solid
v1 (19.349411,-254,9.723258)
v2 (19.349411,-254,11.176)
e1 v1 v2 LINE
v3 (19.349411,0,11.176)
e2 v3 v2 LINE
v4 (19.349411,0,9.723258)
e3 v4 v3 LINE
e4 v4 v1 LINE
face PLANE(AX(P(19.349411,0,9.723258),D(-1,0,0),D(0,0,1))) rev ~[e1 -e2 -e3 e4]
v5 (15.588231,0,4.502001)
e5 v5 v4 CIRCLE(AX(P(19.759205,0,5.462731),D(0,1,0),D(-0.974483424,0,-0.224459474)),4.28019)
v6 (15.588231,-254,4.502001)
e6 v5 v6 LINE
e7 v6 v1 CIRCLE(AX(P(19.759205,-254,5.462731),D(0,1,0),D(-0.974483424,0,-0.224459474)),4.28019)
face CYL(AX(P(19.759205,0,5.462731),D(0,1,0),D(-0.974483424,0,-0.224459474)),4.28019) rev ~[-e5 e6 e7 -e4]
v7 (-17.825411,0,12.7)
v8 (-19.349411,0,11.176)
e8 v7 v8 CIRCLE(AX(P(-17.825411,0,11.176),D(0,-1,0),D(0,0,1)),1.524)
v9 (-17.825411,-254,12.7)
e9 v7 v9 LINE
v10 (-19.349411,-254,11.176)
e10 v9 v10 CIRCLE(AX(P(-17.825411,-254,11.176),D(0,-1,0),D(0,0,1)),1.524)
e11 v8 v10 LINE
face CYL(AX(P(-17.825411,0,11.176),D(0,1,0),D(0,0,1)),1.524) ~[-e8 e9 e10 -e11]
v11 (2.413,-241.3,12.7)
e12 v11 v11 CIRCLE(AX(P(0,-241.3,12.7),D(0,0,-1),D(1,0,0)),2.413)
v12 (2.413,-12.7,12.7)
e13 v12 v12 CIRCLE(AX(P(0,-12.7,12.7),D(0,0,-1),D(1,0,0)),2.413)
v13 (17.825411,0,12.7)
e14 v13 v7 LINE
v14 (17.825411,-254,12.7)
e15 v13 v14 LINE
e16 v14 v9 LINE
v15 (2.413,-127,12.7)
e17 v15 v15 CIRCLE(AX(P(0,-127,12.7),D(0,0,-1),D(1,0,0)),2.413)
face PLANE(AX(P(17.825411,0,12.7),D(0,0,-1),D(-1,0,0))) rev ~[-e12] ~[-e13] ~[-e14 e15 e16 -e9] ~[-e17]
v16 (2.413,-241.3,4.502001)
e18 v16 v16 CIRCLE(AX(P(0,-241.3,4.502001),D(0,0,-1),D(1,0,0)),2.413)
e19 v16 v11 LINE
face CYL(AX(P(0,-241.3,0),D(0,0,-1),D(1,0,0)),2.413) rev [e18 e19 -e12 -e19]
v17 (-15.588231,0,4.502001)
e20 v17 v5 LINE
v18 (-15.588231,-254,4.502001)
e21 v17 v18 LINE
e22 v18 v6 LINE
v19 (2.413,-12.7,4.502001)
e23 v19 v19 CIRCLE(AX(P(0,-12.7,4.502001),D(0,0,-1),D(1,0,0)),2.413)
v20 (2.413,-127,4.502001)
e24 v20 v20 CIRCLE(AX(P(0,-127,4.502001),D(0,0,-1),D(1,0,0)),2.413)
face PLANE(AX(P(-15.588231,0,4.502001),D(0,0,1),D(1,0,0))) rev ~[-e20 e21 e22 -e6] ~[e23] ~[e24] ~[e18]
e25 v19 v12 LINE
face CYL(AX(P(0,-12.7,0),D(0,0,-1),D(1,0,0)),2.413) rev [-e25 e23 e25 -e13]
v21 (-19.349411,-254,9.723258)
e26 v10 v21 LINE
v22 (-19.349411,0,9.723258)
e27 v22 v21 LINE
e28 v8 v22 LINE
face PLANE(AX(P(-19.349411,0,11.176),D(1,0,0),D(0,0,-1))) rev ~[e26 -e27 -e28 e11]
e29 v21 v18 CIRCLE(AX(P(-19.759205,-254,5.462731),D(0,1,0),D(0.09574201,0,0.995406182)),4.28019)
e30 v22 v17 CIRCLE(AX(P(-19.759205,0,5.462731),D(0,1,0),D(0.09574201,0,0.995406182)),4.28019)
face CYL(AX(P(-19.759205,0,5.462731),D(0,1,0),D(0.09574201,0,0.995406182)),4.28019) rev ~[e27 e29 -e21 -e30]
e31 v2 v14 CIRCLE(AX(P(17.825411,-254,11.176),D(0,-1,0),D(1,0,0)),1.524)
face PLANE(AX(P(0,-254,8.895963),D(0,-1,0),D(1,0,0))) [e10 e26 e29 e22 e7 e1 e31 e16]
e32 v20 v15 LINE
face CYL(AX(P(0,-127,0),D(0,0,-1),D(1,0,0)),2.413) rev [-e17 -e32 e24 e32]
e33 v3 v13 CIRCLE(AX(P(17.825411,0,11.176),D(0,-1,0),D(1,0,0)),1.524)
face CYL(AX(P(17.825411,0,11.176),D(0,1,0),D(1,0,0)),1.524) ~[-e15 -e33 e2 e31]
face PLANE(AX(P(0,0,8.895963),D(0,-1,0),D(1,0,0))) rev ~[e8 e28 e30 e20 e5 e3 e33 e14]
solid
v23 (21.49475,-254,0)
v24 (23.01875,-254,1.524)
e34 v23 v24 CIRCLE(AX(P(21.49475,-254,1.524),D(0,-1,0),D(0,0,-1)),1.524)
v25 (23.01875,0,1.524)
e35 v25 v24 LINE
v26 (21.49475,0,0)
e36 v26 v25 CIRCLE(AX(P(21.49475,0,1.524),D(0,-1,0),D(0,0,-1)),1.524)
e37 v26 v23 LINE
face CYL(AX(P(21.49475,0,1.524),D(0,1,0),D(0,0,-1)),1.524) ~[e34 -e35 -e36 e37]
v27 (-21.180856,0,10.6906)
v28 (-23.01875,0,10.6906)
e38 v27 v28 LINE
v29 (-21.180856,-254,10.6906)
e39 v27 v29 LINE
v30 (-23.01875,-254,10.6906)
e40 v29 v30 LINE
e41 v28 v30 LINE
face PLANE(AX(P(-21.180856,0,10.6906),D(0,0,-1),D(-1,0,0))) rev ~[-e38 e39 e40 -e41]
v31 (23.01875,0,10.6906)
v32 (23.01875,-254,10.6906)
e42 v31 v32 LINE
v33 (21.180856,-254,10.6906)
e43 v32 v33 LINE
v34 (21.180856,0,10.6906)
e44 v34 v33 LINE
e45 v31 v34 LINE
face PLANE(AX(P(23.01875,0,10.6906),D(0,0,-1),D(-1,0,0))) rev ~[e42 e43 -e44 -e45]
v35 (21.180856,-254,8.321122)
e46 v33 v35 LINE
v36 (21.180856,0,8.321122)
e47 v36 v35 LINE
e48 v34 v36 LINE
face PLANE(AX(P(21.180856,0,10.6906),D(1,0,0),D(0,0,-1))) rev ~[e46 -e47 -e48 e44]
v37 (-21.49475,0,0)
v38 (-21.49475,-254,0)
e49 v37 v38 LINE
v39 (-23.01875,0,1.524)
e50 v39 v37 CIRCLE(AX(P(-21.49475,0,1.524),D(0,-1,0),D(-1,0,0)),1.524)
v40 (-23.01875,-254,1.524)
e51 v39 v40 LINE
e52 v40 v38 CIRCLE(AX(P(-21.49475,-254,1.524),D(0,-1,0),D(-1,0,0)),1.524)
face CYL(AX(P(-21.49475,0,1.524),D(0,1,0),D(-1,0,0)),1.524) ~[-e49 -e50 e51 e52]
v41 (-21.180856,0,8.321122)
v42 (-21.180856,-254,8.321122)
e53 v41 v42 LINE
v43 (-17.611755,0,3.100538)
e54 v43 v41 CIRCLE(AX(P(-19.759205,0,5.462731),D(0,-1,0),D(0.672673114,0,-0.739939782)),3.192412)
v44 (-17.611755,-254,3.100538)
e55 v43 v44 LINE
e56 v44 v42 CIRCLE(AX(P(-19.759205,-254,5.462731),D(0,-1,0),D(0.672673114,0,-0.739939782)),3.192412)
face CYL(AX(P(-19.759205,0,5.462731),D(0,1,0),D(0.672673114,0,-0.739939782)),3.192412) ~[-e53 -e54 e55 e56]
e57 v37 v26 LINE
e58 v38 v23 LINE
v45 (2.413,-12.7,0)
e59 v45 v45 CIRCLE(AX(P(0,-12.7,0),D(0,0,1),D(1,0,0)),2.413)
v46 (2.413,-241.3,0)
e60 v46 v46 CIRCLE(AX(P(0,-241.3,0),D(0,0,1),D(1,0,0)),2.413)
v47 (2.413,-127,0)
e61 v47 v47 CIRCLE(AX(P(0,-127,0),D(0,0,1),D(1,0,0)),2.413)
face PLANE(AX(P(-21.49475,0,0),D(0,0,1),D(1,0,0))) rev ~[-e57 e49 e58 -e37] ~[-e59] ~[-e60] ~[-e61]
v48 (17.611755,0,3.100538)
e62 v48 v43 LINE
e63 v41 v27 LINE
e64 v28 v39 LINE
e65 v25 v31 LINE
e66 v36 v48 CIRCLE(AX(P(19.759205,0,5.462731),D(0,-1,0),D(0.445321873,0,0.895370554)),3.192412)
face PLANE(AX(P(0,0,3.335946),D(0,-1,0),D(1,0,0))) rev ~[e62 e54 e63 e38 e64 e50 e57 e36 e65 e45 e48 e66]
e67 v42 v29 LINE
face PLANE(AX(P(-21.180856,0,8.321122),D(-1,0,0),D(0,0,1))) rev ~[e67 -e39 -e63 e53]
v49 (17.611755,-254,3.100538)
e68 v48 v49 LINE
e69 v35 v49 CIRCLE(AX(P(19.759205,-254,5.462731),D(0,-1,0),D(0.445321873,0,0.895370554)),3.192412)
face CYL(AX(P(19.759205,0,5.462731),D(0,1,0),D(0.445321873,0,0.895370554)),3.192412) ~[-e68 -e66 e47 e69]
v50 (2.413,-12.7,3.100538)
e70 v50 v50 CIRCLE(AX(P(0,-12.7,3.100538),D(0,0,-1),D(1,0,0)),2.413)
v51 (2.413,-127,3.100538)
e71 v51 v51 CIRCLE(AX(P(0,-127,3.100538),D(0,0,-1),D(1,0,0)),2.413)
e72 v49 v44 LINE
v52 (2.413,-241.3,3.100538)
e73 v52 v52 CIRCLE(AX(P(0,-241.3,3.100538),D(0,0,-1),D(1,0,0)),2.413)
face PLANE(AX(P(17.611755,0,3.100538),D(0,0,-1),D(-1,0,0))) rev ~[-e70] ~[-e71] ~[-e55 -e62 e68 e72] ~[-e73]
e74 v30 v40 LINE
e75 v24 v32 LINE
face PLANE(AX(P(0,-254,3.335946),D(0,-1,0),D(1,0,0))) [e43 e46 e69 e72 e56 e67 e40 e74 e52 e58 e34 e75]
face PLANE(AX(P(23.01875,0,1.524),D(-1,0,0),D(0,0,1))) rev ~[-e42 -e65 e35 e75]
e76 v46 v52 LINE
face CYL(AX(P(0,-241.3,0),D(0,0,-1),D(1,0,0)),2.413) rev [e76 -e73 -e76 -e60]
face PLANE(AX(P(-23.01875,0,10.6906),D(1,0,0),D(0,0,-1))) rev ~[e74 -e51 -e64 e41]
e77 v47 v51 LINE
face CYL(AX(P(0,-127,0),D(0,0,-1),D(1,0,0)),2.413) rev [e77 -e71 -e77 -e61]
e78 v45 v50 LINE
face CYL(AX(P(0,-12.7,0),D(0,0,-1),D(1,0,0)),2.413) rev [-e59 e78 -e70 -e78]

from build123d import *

# Parameters (mm, degrees)
F1_DEPTH      = 254
F2_R          = 2.413
F3_DEPTH      = 386
F3_DEPTH_BACK = 12.701


# Not quite as in the source:
# - an extrude ends at something that could not be found from the text; its depth is read off the source's solid


with BuildPart() as f1:
    # F0 (on Front) → F1 (new body)
    with BuildSketch(Plane.XZ):
        with BuildLine():
            Line((-21.180855953, 10.6905996799), (-23.01875, 10.6905996799))
            Line((-23.01875, 10.6905996799), (-23.01875, 1.524))
            ThreePointArc((-23.01875, 1.524), (-22.5723807345, 0.4463692655), (-21.49475, 0))
            Line((-21.49475, 0), (21.49475, 0))
            ThreePointArc((21.49475, 0), (22.5723807345, 0.4463692655), (23.01875, 1.524))
            Line((23.01875, 1.524), (23.01875, 10.6905996799))
            Line((23.01875, 10.6905996799), (21.180855953, 10.6905996799))
            Line((21.180855953, 10.6905996799), (21.180855953, 8.3211223024))
            ThreePointArc((21.180855953, 8.3211223024), (17.1238073852, 7.2644445689), (17.6117553886, 3.1005380306))
            Line((17.6117553886, 3.1005380306), (-17.6117553886, 3.1005380306))
            ThreePointArc((-17.6117553886, 3.1005380306), (-17.1238073852, 7.2644445689), (-21.180855953, 8.3211223024))
            Line((-21.180855953, 8.3211223024), (-21.180855953, 10.6905996799))
        make_face()
    extrude(amount=F1_DEPTH)


with BuildPart() as f1b:
    # F0 (on Front) → F1, piece 2 (new body)
    with BuildSketch(Plane.XZ):
        with BuildLine():
            ThreePointArc((-19.3494111094, 9.7232580064), (-16.2862756718, 7.9644871947), (-15.5882310877, 4.5020014929))
            Line((-15.5882310877, 4.5020014929), (15.5882310877, 4.5020014929))
            ThreePointArc((15.5882310877, 4.5020014929), (16.2862756718, 7.9644871947), (19.3494111094, 9.7232580064))
            Line((19.3494111094, 9.7232580064), (19.3494111094, 11.176))
            ThreePointArc((19.3494111094, 11.176), (18.9030418439, 12.2536307345), (17.8254111094, 12.7))
            Line((17.8254111094, 12.7), (-17.8254111094, 12.7))
            ThreePointArc((-17.8254111094, 12.7), (-18.9030418439, 12.2536307345), (-19.3494111094, 11.176))
            Line((-19.3494111094, 11.176), (-19.3494111094, 9.7232580064))
        make_face()
    extrude(amount=F1_DEPTH)


with BuildPart() as f3_tool:
    # F2 (on Top) → F3 (new body, two sides)
    with BuildSketch(Plane.XY) as f3_sk:
        with Locations((0, -12.7)):
            Circle(F2_R)
        with Locations((0, -127)):
            Circle(F2_R)
        with Locations((0, -241.3)):
            Circle(F2_R)
    extrude(amount=-F3_DEPTH)
    extrude(f3_sk.sketch, amount=F3_DEPTH_BACK)


with BuildPart() as f1_1:
    add(f1.part)

    # F3: cut by f3_tool
    add(f3_tool.part, mode=Mode.SUBTRACT)


with BuildPart() as f1b_1:
    add(f1b.part)

    # F3: cut by f3_tool
    add(f3_tool.part, mode=Mode.SUBTRACT)


solid = Compound([f1_1.part, f1b_1.part])
